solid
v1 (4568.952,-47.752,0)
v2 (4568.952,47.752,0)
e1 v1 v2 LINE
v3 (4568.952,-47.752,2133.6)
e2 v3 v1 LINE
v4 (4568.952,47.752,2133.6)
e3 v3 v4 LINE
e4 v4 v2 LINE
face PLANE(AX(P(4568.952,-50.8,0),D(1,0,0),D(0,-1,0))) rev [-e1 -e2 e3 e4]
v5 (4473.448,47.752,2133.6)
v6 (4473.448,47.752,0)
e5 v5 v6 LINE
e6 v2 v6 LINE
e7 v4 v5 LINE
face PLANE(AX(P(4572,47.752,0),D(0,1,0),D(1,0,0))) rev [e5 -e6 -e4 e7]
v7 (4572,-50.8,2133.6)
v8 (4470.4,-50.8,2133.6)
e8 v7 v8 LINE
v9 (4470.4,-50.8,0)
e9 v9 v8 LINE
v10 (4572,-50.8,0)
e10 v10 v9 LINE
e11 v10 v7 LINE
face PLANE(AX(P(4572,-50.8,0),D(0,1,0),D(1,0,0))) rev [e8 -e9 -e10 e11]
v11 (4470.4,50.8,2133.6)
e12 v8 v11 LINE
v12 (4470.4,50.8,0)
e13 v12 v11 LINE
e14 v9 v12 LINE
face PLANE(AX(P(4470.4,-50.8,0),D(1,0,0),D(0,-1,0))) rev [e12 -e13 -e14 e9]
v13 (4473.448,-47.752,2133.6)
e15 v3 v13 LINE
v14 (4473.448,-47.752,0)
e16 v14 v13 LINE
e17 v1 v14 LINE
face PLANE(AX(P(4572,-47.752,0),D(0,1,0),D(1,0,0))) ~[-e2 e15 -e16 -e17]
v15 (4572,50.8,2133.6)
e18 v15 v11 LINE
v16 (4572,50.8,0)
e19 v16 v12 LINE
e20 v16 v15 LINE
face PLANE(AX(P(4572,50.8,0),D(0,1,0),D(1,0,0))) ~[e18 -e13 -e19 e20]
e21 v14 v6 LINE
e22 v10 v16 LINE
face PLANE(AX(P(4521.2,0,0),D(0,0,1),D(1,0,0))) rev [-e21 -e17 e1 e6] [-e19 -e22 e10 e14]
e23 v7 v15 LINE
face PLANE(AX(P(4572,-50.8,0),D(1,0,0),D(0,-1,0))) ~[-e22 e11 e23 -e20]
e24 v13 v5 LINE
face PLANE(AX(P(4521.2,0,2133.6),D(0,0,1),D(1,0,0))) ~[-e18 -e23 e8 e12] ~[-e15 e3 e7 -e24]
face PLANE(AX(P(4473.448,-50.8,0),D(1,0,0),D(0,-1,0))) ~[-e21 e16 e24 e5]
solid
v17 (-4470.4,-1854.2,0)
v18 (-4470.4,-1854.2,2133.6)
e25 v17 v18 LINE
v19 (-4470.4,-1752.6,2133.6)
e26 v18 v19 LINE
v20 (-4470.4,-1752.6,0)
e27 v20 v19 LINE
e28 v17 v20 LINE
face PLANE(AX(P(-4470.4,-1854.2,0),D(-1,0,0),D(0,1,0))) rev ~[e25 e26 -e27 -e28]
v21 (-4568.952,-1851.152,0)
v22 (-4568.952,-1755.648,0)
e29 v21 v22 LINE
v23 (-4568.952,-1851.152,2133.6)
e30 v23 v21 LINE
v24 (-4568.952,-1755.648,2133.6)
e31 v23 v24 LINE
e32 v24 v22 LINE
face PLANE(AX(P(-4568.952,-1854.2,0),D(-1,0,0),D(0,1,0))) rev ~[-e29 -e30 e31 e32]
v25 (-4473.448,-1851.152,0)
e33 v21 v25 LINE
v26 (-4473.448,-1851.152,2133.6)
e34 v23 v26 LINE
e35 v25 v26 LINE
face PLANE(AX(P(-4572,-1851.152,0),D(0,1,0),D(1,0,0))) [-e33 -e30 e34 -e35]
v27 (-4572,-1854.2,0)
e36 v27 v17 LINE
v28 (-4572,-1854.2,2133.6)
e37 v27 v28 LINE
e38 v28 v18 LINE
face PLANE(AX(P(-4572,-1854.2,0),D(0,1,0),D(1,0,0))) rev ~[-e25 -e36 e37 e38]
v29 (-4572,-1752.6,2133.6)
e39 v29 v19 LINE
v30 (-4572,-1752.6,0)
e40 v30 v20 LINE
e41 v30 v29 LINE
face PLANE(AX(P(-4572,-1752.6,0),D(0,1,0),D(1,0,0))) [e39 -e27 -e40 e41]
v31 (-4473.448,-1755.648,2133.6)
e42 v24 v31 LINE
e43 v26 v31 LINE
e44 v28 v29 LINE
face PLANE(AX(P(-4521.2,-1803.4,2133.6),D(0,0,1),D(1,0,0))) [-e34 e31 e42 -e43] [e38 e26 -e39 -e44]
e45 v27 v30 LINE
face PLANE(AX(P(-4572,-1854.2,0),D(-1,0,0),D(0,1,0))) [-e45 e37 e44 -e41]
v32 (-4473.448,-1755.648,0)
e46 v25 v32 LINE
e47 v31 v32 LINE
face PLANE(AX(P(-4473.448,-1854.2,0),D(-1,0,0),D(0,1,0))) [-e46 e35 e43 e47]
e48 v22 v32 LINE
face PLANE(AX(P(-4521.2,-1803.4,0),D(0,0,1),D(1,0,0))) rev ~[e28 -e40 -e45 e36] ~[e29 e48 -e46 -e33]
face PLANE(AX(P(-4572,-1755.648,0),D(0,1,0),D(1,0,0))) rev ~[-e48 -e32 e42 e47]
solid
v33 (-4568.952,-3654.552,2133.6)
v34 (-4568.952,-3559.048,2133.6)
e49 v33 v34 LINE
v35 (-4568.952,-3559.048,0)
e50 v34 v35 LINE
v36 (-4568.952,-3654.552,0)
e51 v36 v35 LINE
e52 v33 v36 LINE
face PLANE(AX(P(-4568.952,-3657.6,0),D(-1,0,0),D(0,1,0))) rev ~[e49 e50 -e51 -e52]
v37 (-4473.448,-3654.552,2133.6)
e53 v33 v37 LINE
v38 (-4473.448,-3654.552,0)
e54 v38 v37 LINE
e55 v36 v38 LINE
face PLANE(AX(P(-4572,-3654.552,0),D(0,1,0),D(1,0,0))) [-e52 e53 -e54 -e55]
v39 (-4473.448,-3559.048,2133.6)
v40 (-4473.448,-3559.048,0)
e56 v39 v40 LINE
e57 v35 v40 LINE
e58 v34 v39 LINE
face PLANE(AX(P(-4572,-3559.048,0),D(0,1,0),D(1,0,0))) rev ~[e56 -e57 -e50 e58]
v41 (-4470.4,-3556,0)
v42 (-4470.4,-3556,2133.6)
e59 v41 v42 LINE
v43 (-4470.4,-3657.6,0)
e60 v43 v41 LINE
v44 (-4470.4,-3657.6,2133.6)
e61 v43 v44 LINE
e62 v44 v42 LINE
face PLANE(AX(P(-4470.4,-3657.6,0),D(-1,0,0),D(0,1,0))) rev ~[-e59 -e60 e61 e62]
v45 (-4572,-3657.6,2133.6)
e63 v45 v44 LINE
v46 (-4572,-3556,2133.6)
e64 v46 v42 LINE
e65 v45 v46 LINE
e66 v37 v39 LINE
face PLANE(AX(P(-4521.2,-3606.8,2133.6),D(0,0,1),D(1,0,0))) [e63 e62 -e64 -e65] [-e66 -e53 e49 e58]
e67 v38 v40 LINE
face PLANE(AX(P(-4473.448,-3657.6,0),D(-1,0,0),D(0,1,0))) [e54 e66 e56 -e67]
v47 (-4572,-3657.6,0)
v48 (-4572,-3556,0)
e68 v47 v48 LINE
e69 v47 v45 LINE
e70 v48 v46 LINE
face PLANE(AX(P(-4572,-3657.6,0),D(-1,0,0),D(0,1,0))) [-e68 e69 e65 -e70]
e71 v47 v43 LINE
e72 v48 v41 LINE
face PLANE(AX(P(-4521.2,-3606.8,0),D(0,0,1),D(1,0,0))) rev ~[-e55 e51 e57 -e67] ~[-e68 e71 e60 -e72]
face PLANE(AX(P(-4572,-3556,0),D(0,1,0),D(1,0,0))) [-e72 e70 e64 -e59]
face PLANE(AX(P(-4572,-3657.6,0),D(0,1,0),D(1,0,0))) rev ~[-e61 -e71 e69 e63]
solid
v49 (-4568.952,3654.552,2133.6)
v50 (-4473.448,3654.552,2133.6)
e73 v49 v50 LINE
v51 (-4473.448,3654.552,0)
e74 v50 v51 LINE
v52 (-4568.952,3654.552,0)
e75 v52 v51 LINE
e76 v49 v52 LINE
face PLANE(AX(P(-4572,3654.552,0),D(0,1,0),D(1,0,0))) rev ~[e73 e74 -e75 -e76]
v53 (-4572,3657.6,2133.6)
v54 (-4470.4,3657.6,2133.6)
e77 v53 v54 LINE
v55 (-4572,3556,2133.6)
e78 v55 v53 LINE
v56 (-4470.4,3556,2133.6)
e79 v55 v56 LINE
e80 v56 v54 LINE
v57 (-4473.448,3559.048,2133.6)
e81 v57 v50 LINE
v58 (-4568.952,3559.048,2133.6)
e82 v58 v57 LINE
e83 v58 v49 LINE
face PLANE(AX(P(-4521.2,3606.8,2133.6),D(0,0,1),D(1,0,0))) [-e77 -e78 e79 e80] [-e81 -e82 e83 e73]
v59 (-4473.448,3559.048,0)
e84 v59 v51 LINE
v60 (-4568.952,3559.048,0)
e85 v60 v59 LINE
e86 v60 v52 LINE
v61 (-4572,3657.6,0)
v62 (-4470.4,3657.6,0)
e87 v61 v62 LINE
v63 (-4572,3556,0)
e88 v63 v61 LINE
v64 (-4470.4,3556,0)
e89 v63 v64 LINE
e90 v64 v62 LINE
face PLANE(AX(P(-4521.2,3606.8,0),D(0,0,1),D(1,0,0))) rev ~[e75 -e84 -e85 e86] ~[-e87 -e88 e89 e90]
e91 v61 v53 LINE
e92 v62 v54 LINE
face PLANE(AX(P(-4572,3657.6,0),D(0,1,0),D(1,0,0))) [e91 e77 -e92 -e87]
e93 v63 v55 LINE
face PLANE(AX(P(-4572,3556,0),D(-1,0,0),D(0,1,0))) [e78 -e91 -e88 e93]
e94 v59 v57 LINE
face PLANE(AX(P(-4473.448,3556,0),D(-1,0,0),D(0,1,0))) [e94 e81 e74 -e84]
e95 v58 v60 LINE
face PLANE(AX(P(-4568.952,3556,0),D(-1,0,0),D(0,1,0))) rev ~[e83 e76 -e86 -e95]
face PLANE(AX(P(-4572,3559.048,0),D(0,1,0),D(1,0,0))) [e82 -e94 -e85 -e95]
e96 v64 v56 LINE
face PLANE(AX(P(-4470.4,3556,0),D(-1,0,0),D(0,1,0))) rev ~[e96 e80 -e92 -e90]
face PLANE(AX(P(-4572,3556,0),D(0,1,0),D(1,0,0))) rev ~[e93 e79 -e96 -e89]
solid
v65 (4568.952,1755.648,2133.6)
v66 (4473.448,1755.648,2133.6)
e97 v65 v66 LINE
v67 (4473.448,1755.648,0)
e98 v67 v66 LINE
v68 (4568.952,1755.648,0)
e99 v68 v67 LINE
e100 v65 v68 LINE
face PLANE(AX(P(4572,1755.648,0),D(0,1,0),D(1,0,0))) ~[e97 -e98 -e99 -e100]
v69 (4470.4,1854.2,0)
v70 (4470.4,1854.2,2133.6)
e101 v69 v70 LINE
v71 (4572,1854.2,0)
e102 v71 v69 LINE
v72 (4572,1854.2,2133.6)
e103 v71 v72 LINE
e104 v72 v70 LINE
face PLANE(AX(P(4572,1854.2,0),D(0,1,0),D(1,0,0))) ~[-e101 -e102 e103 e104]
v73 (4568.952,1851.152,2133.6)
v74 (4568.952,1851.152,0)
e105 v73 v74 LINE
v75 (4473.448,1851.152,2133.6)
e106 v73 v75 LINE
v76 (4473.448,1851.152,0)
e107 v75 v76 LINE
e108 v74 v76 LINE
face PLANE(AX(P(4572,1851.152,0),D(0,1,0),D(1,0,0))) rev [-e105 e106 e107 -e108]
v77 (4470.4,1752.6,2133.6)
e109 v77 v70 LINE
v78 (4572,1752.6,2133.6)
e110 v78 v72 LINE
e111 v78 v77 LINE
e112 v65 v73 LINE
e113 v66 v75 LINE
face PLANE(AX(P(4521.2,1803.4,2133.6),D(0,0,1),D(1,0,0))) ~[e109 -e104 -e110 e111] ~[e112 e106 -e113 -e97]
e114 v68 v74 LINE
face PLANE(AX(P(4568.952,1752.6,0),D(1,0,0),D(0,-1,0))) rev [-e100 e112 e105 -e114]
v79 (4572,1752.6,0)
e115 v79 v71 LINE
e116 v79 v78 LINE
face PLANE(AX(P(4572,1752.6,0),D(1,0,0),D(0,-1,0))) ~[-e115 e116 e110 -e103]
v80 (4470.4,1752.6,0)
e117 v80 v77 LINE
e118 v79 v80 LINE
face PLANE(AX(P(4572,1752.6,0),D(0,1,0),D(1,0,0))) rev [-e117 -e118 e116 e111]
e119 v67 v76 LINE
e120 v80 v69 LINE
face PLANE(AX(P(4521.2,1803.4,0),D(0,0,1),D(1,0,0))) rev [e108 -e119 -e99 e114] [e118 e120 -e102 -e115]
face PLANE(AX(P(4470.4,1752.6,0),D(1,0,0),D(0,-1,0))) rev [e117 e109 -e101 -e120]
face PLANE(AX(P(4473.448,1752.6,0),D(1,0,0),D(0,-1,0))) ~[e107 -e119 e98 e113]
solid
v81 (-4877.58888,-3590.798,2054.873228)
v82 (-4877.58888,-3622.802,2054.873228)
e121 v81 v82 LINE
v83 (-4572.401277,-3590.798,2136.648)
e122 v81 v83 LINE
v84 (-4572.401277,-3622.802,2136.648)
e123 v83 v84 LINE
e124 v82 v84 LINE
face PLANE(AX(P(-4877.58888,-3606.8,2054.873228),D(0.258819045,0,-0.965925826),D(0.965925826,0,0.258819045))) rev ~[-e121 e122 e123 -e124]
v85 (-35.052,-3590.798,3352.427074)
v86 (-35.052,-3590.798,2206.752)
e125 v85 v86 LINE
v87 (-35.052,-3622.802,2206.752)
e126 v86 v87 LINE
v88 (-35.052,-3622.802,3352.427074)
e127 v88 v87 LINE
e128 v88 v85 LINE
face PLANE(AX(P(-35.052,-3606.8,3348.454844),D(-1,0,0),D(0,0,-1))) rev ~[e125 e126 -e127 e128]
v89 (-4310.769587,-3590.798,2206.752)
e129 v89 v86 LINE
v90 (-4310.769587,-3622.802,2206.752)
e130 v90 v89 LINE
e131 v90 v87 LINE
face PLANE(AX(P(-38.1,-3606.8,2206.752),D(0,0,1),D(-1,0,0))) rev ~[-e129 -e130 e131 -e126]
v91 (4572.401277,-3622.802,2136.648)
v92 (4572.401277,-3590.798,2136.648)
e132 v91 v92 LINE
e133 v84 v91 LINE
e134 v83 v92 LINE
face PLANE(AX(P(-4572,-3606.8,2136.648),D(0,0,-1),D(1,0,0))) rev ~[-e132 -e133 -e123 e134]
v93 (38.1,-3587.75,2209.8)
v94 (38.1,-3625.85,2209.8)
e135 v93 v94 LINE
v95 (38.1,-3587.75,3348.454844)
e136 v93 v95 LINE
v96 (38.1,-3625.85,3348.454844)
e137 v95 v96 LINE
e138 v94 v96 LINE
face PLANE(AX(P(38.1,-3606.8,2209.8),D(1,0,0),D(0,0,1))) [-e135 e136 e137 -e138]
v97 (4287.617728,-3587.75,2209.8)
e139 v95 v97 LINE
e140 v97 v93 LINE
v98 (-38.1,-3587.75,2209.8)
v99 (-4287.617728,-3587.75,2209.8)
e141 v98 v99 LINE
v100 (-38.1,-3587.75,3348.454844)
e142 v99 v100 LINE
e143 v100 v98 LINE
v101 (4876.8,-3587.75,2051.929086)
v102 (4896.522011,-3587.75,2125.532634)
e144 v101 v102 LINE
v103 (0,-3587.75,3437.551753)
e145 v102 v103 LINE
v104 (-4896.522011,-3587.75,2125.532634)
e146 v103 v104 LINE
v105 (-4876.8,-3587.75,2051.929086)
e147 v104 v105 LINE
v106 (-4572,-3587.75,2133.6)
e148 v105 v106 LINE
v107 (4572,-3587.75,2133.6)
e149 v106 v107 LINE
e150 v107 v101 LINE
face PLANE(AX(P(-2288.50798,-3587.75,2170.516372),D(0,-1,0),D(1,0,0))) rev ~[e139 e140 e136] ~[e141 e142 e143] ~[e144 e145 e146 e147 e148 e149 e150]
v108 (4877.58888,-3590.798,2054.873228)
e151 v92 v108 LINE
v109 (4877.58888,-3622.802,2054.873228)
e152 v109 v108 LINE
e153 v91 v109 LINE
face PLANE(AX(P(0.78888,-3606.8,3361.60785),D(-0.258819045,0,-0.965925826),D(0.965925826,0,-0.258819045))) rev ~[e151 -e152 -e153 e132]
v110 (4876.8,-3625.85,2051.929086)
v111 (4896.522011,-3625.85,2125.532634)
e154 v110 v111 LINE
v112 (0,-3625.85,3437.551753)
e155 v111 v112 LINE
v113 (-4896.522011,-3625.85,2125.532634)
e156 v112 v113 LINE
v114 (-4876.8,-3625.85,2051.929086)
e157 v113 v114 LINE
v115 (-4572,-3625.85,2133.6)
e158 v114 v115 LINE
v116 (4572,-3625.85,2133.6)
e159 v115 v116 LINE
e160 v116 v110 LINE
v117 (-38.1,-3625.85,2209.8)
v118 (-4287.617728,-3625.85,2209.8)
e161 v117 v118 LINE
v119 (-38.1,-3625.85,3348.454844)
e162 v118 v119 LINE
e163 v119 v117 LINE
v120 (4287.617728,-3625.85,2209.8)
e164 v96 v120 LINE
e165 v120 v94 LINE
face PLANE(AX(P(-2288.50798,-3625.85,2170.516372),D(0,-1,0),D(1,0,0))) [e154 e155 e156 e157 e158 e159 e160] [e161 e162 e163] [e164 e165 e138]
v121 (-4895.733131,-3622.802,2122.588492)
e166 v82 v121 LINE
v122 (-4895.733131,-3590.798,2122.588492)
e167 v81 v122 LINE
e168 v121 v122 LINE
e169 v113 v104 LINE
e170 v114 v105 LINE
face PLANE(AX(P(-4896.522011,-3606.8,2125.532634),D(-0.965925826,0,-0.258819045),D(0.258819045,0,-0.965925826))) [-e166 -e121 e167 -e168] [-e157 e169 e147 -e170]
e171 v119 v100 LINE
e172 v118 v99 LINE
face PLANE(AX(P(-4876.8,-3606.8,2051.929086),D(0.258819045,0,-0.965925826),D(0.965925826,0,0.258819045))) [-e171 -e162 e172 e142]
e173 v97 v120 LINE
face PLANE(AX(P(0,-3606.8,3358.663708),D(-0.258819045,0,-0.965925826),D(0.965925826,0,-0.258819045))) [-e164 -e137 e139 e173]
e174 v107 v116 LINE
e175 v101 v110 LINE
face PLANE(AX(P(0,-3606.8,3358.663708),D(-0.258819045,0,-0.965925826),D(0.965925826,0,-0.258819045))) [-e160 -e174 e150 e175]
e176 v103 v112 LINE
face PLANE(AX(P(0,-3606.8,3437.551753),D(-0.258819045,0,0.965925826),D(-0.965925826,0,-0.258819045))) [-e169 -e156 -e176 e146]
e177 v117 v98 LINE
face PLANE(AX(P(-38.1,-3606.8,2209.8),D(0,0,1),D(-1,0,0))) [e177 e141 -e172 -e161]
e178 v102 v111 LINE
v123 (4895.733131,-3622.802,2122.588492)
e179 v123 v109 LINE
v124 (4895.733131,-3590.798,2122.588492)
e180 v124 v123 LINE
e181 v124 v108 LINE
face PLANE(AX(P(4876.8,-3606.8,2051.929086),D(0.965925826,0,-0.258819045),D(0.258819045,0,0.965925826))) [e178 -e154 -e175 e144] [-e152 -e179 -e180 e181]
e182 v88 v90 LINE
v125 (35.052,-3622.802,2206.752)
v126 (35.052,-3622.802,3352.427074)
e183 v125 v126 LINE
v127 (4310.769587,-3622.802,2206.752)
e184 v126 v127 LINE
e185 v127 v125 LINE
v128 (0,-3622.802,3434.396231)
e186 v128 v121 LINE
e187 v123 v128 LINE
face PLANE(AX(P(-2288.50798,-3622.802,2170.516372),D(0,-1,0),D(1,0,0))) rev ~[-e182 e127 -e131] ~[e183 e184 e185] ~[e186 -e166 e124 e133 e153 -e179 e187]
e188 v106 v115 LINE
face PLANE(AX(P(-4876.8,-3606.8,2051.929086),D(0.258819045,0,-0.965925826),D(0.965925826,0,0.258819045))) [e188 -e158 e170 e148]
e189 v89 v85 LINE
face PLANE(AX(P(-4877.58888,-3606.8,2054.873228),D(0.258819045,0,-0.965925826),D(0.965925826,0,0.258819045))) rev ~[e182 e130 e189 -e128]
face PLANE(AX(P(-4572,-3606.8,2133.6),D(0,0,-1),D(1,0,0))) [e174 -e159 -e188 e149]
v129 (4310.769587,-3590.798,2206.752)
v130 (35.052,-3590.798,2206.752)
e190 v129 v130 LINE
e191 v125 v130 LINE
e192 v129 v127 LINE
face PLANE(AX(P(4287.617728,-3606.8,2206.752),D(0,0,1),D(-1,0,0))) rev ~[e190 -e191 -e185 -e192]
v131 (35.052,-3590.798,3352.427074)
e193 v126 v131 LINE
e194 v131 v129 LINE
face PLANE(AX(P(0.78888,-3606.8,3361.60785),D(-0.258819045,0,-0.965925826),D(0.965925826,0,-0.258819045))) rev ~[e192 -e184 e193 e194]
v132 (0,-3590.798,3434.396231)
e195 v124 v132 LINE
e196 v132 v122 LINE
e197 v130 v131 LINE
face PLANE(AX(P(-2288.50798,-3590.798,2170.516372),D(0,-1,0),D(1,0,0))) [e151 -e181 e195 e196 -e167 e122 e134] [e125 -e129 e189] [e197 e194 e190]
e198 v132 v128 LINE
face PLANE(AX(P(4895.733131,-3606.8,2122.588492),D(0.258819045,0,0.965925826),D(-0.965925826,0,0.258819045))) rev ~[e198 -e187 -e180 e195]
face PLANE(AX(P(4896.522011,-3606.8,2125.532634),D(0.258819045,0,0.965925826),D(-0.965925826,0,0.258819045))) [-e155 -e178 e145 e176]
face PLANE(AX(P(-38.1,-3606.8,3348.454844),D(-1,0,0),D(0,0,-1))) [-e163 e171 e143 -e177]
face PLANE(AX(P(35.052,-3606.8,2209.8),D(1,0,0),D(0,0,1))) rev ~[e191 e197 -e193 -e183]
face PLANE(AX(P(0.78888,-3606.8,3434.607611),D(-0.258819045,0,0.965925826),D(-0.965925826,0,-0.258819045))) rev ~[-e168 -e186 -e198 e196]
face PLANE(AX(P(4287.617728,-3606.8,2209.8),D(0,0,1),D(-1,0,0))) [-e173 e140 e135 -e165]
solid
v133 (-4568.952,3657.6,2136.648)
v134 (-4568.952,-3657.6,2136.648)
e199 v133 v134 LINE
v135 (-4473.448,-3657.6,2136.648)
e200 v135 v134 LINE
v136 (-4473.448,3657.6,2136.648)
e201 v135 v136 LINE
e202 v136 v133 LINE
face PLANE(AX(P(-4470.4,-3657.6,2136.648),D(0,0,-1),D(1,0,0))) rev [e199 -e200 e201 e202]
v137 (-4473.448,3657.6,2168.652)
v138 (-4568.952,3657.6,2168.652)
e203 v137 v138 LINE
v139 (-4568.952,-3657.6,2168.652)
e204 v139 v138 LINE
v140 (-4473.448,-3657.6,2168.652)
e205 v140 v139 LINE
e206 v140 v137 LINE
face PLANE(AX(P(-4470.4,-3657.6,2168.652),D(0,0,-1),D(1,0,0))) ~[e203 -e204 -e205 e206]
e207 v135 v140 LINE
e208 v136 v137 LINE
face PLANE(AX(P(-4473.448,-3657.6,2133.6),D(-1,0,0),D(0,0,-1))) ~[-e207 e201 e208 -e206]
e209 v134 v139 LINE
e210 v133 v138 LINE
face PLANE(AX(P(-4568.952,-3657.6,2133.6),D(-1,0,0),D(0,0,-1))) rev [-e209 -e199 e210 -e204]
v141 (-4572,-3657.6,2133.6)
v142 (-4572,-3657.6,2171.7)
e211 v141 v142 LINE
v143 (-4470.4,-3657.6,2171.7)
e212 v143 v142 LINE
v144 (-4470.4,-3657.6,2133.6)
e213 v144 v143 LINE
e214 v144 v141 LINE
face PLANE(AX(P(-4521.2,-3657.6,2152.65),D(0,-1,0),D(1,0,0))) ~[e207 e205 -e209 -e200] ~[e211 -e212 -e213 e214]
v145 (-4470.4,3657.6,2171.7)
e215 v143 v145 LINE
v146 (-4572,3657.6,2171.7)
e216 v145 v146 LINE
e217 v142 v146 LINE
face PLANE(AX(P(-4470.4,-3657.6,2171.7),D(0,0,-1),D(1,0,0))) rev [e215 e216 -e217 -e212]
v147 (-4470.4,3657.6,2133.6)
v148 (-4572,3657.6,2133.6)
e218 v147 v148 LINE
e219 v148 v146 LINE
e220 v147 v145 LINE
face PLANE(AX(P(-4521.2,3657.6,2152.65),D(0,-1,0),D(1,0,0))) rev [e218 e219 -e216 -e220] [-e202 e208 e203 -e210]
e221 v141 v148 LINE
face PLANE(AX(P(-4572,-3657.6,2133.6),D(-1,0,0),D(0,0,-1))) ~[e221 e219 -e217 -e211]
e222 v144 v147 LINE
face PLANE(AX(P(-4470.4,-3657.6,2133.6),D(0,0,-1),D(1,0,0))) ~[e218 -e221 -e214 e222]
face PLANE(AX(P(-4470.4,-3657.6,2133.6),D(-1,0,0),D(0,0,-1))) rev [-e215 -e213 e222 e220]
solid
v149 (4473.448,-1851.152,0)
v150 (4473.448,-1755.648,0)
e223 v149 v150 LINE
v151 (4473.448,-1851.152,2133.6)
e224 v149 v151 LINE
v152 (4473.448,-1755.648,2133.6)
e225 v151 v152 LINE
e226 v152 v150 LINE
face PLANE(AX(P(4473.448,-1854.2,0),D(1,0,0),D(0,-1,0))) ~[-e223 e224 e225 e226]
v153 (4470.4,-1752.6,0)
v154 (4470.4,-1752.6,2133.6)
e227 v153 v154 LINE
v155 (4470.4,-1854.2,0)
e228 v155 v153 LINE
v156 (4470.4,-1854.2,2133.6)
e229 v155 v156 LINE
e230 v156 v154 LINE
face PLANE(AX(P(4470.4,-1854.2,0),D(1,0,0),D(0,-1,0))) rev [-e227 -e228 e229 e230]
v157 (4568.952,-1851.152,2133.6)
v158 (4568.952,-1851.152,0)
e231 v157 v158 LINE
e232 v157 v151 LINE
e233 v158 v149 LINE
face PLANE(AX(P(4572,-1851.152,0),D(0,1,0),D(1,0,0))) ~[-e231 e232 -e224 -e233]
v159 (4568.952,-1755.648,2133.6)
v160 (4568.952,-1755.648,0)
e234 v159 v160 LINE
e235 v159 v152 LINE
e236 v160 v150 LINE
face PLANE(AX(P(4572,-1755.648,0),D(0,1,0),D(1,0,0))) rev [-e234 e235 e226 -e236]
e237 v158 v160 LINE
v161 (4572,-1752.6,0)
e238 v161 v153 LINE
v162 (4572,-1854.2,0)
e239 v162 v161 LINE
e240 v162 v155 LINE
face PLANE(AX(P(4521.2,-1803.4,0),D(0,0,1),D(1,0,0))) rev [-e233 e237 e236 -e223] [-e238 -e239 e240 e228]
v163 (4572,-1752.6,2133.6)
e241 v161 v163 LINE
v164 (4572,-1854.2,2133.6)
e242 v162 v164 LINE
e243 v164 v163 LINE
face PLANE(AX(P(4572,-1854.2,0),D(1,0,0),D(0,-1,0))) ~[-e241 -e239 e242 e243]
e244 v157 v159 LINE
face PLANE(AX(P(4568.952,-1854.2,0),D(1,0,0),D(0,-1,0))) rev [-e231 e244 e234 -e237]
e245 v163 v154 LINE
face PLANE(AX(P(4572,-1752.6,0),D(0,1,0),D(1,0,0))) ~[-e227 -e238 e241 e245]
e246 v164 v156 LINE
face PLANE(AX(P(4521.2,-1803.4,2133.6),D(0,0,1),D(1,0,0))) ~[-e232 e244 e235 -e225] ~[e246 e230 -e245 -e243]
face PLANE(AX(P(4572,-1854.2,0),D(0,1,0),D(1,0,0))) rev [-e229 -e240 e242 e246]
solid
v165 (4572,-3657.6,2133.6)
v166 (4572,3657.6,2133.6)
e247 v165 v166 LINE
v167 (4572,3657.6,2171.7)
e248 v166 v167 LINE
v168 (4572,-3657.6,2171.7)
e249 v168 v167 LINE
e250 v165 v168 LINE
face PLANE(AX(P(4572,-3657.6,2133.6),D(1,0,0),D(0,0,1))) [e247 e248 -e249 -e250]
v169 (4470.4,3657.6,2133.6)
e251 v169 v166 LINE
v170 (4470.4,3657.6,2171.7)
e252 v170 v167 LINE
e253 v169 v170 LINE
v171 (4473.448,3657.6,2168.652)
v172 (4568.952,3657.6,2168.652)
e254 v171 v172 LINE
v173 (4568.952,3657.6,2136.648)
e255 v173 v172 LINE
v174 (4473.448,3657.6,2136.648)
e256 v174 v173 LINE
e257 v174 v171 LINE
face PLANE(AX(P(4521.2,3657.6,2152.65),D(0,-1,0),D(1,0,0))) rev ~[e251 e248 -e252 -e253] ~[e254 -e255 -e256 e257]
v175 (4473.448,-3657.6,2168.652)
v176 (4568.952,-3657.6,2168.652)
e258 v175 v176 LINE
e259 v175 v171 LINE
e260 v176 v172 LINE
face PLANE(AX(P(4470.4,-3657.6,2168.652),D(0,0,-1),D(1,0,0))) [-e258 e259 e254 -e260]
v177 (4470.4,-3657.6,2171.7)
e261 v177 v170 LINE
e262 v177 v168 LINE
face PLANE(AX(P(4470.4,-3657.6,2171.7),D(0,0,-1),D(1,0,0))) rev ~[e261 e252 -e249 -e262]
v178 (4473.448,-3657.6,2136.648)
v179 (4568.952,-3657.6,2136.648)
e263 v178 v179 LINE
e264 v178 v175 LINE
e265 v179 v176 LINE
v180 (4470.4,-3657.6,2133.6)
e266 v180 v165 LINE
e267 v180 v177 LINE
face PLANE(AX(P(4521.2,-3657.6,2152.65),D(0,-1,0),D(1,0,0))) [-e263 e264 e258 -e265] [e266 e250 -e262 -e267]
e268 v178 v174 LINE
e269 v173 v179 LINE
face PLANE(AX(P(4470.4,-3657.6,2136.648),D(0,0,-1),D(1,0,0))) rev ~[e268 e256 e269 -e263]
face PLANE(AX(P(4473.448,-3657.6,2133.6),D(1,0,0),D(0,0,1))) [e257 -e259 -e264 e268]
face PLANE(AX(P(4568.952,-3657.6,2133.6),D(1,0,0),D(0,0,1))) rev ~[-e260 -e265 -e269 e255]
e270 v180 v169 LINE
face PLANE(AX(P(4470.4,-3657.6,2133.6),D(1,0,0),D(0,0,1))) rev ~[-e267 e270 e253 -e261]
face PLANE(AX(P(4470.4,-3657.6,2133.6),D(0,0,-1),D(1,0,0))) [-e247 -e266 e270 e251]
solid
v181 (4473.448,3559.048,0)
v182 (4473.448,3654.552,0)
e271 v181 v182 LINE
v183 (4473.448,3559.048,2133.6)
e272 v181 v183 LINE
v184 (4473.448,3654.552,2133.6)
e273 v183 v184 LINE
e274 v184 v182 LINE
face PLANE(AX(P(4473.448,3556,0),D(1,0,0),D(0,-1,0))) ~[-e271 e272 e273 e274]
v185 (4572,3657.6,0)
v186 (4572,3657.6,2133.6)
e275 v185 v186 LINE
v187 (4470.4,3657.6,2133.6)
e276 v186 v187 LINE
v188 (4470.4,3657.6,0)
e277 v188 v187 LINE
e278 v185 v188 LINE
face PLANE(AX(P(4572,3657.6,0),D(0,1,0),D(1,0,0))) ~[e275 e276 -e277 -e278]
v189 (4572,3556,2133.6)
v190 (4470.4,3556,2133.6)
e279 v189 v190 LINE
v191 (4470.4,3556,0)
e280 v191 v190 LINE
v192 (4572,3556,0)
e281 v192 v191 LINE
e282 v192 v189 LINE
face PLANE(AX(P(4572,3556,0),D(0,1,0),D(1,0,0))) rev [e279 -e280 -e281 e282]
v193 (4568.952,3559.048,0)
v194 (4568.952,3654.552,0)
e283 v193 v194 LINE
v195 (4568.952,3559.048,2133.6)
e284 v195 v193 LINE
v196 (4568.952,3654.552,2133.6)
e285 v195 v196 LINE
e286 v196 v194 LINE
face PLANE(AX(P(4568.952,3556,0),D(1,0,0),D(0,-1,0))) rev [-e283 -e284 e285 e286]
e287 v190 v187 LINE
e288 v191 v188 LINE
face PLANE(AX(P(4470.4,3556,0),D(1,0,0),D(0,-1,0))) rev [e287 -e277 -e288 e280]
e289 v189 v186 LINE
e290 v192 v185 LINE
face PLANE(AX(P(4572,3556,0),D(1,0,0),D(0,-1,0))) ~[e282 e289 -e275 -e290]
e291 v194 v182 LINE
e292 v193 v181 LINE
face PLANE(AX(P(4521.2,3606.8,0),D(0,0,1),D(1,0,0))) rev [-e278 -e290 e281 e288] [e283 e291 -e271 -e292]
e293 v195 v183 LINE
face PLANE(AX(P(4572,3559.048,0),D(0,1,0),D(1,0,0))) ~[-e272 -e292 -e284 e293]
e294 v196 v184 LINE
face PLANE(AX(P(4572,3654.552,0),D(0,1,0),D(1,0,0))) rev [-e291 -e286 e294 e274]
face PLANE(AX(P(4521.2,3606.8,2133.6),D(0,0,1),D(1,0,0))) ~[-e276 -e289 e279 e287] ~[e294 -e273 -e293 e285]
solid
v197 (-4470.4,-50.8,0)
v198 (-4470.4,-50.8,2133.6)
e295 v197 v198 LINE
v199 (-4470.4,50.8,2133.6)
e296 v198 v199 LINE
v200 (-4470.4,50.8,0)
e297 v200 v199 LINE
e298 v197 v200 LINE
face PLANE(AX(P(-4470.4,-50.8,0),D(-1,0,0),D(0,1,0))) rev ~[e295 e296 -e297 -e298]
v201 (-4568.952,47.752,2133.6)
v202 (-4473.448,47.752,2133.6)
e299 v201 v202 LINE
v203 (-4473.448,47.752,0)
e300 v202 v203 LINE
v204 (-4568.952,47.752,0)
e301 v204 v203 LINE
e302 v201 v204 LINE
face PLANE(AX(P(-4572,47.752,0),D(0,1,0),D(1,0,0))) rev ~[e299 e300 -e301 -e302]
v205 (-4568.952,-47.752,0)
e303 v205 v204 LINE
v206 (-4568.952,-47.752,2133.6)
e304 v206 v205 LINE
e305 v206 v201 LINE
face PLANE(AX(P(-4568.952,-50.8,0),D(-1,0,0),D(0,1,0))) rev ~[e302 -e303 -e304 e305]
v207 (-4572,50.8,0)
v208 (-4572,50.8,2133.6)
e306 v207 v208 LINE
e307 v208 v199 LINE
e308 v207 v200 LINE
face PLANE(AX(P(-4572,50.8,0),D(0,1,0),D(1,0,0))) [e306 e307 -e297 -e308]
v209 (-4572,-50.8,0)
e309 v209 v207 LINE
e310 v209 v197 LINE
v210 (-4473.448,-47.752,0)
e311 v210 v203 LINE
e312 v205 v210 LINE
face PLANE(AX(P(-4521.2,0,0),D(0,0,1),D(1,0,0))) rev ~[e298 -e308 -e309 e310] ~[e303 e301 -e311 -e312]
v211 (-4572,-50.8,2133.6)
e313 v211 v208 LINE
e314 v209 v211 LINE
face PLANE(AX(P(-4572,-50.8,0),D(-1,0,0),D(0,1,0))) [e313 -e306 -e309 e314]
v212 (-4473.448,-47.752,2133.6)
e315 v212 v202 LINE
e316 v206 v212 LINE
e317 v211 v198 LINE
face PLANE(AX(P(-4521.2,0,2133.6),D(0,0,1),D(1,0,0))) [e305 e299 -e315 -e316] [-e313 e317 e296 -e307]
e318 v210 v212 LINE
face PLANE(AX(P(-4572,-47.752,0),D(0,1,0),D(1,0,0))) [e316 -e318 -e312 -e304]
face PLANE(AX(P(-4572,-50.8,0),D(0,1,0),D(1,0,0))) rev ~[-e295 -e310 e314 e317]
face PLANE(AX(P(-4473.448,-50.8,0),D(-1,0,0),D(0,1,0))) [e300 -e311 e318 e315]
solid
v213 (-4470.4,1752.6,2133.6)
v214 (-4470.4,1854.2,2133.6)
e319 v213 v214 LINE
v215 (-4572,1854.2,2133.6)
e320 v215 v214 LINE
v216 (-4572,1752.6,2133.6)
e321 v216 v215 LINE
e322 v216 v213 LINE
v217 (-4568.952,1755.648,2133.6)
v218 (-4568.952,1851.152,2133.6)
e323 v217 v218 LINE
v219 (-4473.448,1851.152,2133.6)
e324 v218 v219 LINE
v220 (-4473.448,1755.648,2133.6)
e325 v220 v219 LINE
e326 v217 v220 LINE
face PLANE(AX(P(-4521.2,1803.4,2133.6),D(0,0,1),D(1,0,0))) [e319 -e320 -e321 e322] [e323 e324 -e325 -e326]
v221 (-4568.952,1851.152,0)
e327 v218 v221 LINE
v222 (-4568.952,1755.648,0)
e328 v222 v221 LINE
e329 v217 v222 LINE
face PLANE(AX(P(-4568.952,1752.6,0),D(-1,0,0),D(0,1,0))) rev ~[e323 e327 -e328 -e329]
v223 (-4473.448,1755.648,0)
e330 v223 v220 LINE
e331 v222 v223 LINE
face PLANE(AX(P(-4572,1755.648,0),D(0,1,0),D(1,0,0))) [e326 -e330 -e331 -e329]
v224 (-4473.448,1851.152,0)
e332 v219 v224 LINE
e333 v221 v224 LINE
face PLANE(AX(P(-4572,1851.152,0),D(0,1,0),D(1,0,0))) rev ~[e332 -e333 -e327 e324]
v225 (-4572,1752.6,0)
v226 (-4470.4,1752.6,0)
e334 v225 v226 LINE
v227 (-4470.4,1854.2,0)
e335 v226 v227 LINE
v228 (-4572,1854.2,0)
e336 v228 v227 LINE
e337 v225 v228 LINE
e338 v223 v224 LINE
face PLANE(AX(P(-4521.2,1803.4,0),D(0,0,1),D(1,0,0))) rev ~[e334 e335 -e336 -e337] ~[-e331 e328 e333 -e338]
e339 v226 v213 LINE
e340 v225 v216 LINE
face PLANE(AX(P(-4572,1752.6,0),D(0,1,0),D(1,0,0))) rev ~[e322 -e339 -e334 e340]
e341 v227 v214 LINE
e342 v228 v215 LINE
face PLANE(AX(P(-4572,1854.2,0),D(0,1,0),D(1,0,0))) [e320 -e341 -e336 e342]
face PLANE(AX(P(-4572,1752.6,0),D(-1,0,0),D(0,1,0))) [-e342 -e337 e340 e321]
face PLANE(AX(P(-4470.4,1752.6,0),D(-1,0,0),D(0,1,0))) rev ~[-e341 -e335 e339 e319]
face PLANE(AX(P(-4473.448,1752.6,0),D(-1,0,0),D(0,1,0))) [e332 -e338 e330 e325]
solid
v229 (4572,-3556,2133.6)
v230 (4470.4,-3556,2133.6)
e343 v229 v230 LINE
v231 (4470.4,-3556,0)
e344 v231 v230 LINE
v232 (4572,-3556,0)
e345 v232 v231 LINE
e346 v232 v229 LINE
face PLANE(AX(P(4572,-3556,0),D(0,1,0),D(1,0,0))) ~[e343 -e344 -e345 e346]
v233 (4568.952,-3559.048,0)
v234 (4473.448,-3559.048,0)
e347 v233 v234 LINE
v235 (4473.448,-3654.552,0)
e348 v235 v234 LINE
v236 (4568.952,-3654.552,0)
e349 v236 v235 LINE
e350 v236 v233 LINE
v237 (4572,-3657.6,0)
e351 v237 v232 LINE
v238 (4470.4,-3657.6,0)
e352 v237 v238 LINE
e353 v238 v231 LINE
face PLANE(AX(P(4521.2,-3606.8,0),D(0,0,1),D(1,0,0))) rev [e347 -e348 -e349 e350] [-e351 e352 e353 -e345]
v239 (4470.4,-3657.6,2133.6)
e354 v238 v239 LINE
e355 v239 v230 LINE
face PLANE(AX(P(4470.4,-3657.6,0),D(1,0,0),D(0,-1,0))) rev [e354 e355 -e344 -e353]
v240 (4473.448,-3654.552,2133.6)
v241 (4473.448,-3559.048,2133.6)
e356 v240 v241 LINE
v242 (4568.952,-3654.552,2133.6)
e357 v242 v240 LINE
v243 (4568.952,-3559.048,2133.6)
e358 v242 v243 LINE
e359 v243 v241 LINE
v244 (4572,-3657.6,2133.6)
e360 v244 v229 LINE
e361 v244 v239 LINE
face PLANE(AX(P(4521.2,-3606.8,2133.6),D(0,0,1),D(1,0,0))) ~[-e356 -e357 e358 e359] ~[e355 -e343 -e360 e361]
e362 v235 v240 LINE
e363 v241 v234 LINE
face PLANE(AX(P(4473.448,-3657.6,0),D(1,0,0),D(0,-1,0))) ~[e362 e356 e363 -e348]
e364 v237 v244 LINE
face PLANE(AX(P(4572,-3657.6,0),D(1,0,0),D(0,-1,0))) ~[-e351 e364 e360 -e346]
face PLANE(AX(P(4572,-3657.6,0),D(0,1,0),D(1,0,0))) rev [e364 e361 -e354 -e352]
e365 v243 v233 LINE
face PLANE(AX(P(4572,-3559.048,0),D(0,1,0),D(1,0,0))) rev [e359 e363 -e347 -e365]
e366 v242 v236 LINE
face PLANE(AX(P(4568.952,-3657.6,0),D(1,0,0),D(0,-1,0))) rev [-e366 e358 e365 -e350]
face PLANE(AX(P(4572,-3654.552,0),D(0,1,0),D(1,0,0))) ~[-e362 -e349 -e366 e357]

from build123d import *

# Parameters (mm, degrees)
F5_W      = 101.6
F5_H      = 101.6
F6_DEPTH  = 2133.6
F7_T      = -3.048
F7_2_T    = -3.048
F7_3_T    = -3.048
F7_4_T    = -3.048
F7_5_T    = -3.048
F11_DEPTH = 19.05
F10_W     = 76.2
F10_H     = 76.2
F12_DEPTH = 19.05
F13_T     = -3.048
F14_W     = 101.6
F14_H     = 38.1
F15_DEPTH = 7315.2
F16_T     = -3.048


with BuildPart() as f6:
    # F5 (on Top) → F6 (new body)
    with BuildSketch(Plane.XY):
        with Locations((-4521.2, 3606.8)):
            Rectangle(F5_W, F5_H)
    extrude(amount=F6_DEPTH)

    # F7
    f7_openings = [f6.faces().sort_by_distance(p)[0] for p in [
        (-4521.2, 3606.8, 2133.6),
        (-4521.2, 3606.8, 0),
    ]]
    offset(amount=F7_T, openings=f7_openings)


with BuildPart() as f6b:
    # F5 (on Top) → F6, piece 2 (new body)
    with BuildSketch(Plane.XY):
        with Locations((-4521.2, 1803.4)):
            Rectangle(F5_W, F5_H)
    extrude(amount=F6_DEPTH)

    # F7#2
    f7_2_openings = [f6b.faces().sort_by_distance(p)[0] for p in [
        (-4521.2, 1803.4, 2133.6),
        (-4521.2, 1803.4, 0),
    ]]
    offset(amount=F7_2_T, openings=f7_2_openings)


with BuildPart() as f6c:
    # F5 (on Top) → F6, piece 3 (new body)
    with BuildSketch(Plane.XY):
        with Locations((-4521.2, 0)):
            Rectangle(F5_W, F5_H)
    extrude(amount=F6_DEPTH)

    # F7#3
    f7_3_openings = [f6c.faces().sort_by_distance(p)[0] for p in [
        (-4521.2, 0, 2133.6),
        (-4521.2, 0, 0),
    ]]
    offset(amount=F7_3_T, openings=f7_3_openings)


with BuildPart() as f6d:
    # F5 (on Top) → F6, piece 4 (new body)
    with BuildSketch(Plane.XY):
        with Locations((-4521.2, -1803.4)):
            Rectangle(F5_W, F5_H)
    extrude(amount=F6_DEPTH)

    # F7#4
    f7_4_openings = [f6d.faces().sort_by_distance(p)[0] for p in [
        (-4521.2, -1803.4, 2133.6),
        (-4521.2, -1803.4, 0),
    ]]
    offset(amount=F7_4_T, openings=f7_4_openings)


with BuildPart() as f6e:
    # F5 (on Top) → F6, piece 5 (new body)
    with BuildSketch(Plane.XY):
        with Locations((-4521.2, -3606.8)):
            Rectangle(F5_W, F5_H)
    extrude(amount=F6_DEPTH)

    # F7#5
    f7_5_openings = [f6e.faces().sort_by_distance(p)[0] for p in [
        (-4521.2, -3606.8, 2133.6),
        (-4521.2, -3606.8, 0),
    ]]
    offset(amount=F7_5_T, openings=f7_5_openings)


with BuildPart() as f8_1:
    # F8: instance of F6c
    add(f6c.part.mirror(Plane.YZ))


with BuildPart() as f8_2:
    # F8: instance of F6d
    add(f6d.part.mirror(Plane.YZ))


with BuildPart() as f8_3:
    # F8: instance of F6e
    add(f6e.part.mirror(Plane.YZ))


with BuildPart() as f8_4:
    # F8: instance of F6b
    add(f6b.part.mirror(Plane.YZ))


with BuildPart() as f8_5:
    # F8: instance of F6
    add(f6.part.mirror(Plane.YZ))


with BuildPart() as f11:
    # F10 (on mid) → F11 (new body, symmetric)
    with BuildSketch(Plane.XZ.offset(3606.8)):
        Polygon((-4572, 2133.6), (-4572, 2209.8), (-4287.6177284633, 2209.8), (-38.1, 3348.4548435635), (0, 3358.6637077951), (38.1, 3348.4548435635), (4287.6177284633, 2209.8), (4572, 2209.8), (4572, 2133.6), (4876.8, 2051.929086147), (4896.5220112368, 2125.5326341102), (0, 3437.5517527423), (-4896.5220112368, 2125.5326341102), (-4876.8, 2051.929086147), align=None)
        Polygon((-4287.6177284633, 2209.8), (-4572, 2209.8), (-4572, 2133.6), align=None)
        Polygon((4572, 2209.8), (4287.6177284633, 2209.8), (4572, 2133.6), align=None)
    extrude(amount=F11_DEPTH, both=True)

    # F10 (on mid) → F12 (join, symmetric)
    with BuildSketch(Plane.XZ.offset(3606.8)):
        Polygon((-38.1, 2209.8), (-4287.6177284633, 2209.8), (-4572, 2133.6), (-38.1, 2133.6), align=None)
        Polygon((4287.6177284633, 2209.8), (38.1, 2209.8), (38.1, 2133.6), (4572, 2133.6), align=None)
        with Locations((0, 2171.7)):
            Rectangle(F10_W, F10_H)
        Polygon((-38.1, 3348.4548435635), (-38.1, 2209.8), (38.1, 2209.8), (38.1, 3348.4548435635), (0, 3358.6637077951), align=None)
    extrude(amount=F12_DEPTH, both=True)

    # F13
    f13_openings = [f11.faces().sort_by_distance(p)[0] for p in [
        (4886.661006, -3606.8, 2088.73086),
        (-4886.661006, -3606.8, 2088.73086),
    ]]
    offset(amount=F13_T, openings=f13_openings, kind=Kind.INTERSECTION)


with BuildPart() as f15:
    # F14 (on face) → F15 (new body, through all)
    with BuildSketch(Plane.XZ.offset(3657.6)):
        with Locations((4521.2, 2152.65)):
            Rectangle(F14_W, F14_H)
    extrude(amount=-F15_DEPTH)

    # F16
    f16_openings = [f15.faces().sort_by_distance(p)[0] for p in [
        (4521.2, 3657.6, 2152.65),
        (4521.2, -3657.6, 2152.65),
    ]]
    offset(amount=F16_T, openings=f16_openings)


with BuildPart() as f17_1:
    # F17: instance of F15
    add(f15.part.mirror(Plane.YZ))


solid = Compound([f6.part, f6b.part, f6c.part, f6d.part, f6e.part, f8_1.part, f8_2.part, f8_3.part, f8_4.part, f8_5.part, f11.part, f15.part, f17_1.part])
